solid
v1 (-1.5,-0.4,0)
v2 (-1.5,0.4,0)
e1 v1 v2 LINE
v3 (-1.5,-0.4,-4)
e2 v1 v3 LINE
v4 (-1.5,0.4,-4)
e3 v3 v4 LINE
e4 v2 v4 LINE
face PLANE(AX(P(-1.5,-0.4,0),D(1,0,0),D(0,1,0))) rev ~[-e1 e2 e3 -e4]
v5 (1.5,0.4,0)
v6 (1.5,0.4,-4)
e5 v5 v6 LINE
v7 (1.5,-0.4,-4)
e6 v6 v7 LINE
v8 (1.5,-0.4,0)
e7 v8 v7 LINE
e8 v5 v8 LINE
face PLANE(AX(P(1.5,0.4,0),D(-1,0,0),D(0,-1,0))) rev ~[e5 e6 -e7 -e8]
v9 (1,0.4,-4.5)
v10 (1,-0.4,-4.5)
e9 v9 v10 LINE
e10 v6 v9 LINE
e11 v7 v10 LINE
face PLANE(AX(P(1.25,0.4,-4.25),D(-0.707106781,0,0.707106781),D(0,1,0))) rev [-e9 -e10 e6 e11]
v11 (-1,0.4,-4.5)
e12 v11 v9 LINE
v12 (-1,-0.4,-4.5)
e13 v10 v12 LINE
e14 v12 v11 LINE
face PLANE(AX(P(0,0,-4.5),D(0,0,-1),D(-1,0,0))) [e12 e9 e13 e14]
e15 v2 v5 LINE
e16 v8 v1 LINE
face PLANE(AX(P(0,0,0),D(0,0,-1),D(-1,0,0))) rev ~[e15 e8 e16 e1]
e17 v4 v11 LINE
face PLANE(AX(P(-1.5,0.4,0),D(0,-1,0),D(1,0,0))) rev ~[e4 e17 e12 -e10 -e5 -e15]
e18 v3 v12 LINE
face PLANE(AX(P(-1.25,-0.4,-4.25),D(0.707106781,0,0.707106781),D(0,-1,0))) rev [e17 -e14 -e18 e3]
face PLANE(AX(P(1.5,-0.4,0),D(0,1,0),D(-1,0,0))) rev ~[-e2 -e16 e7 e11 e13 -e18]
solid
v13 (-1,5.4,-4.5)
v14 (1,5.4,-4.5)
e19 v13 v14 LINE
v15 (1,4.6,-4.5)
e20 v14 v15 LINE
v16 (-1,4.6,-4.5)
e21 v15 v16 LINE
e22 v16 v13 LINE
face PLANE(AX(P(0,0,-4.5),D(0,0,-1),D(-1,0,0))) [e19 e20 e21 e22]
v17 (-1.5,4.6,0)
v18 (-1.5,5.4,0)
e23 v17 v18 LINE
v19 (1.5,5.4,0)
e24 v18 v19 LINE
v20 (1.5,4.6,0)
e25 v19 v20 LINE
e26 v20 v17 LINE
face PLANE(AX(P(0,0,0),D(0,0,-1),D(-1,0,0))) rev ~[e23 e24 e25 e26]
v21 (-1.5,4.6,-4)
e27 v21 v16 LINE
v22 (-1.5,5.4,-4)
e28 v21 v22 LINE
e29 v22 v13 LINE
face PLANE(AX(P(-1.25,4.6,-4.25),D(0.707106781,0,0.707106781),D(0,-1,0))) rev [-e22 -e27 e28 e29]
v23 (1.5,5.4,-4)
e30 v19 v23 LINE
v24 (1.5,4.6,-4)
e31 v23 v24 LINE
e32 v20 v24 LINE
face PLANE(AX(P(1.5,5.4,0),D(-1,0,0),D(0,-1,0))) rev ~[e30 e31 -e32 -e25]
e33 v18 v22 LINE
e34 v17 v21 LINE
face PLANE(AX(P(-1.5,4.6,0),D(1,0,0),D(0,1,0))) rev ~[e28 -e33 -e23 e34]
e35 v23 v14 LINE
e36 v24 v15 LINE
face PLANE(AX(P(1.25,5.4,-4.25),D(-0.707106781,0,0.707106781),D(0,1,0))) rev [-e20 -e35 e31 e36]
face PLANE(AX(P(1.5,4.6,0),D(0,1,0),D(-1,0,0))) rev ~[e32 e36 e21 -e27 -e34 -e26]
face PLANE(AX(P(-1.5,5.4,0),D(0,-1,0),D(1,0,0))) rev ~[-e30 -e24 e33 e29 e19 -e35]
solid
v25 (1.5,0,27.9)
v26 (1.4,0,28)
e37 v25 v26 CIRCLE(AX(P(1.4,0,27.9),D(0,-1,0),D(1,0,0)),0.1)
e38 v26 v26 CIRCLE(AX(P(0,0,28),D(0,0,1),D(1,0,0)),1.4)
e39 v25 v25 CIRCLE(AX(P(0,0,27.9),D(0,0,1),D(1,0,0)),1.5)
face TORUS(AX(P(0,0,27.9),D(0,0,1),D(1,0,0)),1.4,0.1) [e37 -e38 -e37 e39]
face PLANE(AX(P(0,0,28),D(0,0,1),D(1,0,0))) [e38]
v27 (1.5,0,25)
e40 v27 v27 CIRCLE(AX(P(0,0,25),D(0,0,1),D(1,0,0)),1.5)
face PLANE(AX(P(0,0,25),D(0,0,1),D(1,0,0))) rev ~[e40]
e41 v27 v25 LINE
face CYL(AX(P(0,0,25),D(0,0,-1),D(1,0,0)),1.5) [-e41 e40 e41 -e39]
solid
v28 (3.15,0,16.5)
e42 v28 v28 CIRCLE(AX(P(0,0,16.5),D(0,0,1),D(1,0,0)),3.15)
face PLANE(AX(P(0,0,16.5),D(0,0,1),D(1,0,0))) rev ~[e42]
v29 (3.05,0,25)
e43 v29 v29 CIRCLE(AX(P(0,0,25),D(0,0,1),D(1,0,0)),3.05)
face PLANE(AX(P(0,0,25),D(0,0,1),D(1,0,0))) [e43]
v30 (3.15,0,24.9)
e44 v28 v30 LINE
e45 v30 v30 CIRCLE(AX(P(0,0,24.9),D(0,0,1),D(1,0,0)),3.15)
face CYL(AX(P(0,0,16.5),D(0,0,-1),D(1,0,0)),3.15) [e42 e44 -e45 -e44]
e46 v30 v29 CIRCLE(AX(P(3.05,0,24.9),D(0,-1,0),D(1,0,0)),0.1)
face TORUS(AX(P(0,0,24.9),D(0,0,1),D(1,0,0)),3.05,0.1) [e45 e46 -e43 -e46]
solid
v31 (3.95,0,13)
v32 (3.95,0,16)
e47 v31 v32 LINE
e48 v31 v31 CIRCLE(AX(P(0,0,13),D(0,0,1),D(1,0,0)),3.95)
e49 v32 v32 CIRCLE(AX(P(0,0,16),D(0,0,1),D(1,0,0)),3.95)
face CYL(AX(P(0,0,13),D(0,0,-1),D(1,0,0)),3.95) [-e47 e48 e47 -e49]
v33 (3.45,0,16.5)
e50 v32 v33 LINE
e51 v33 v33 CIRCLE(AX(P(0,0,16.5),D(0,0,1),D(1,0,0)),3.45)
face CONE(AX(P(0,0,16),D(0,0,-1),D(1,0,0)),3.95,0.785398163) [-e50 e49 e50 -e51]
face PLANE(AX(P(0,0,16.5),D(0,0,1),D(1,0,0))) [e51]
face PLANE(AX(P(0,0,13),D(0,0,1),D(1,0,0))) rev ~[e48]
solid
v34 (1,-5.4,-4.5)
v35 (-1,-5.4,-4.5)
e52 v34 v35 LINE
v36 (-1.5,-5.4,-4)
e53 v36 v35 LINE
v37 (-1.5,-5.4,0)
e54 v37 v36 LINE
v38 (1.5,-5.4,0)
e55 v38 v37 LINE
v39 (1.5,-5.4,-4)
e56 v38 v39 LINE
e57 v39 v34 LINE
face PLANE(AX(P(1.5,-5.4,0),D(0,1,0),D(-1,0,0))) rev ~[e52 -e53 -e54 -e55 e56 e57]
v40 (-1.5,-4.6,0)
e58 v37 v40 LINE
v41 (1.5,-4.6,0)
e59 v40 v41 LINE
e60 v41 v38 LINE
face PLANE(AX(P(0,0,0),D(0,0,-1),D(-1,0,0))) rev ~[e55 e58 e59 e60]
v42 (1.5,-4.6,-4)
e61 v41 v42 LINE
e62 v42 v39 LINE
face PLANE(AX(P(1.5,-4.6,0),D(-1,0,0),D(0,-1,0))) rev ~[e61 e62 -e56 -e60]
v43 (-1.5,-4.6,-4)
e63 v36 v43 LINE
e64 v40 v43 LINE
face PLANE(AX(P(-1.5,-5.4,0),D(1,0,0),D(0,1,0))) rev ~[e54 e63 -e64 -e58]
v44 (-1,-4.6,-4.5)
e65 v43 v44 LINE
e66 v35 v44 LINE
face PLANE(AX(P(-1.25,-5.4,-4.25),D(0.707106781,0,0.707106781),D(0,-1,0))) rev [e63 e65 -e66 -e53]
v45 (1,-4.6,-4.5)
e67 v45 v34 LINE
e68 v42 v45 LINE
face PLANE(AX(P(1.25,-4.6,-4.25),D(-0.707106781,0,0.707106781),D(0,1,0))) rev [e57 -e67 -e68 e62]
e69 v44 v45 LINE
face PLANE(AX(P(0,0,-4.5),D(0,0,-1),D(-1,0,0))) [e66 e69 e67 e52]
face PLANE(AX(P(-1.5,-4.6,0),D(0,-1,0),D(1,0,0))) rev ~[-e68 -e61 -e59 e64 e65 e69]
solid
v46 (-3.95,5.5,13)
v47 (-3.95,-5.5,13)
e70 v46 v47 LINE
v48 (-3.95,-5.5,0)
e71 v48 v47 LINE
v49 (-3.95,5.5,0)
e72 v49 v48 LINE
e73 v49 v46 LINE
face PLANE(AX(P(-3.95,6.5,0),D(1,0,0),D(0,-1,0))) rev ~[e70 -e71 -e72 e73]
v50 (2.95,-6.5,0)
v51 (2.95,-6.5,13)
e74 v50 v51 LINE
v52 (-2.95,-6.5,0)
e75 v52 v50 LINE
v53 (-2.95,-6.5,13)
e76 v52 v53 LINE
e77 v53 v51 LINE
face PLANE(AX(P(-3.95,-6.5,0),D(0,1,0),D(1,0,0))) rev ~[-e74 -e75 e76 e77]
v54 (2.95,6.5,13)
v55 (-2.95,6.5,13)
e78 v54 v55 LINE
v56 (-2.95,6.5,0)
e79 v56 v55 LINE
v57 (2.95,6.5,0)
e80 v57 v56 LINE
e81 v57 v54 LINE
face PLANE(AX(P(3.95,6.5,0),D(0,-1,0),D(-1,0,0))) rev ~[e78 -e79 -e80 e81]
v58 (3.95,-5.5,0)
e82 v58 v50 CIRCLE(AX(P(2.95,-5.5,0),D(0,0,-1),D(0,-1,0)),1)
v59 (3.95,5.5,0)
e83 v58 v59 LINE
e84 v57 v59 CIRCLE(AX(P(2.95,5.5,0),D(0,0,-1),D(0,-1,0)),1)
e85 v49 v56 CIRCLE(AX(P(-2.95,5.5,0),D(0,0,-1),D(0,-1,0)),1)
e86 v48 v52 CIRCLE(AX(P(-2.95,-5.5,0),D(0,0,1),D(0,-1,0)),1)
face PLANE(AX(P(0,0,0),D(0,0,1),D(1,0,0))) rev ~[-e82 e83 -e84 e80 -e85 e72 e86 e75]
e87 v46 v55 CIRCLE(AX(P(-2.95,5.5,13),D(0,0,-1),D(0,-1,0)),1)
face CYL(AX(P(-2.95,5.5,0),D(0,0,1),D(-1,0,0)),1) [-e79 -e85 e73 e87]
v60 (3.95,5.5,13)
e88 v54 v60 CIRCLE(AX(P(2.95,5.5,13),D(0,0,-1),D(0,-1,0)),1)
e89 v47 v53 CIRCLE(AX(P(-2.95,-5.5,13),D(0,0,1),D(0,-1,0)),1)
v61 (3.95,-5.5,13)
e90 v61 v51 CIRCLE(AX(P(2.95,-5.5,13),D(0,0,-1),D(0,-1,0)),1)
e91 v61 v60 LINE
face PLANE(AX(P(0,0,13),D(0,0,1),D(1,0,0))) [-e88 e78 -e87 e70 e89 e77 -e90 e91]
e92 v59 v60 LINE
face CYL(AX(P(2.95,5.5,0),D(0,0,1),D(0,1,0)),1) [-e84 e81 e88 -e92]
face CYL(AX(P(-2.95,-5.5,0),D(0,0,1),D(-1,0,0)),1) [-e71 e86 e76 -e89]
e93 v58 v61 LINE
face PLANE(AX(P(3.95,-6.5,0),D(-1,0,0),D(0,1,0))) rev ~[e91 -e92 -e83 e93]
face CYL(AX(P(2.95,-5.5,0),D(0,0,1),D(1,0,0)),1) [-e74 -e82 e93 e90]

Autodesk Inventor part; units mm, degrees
ref_plane "YZ Plane" through (0, 0, 0) normal (1, 0, 0) x (0, 1, 0)
ref_plane "XZ Plane" through (0, 0, 0) normal (0, 1, 0) x (-1, 0, 0)
ref_plane "XY Plane" through (0, 0, 0) normal (0, 0, 1) x (1, 0, 0)
sketch "Sketch1" plane through (0, 0, 0) normal (0, 0, 1) x (1, 0, 0)
  line L0 (-3.95, -6.5) -> (3.95, -6.5)
  line L1 (3.95, -6.5) -> (3.95, 6.5)
  line L2 (3.95, 6.5) -> (-3.95, 6.5)
  line L3 (-3.95, 6.5) -> (-3.95, -6.5)
  line L4 (-3.95, -6.5) -> (3.95, 6.5) construction
  line L5 (3.95, -6.5) -> (-3.95, 6.5) construction
  point P0 (0, 0)
  dimension "d0" = 13
  dimension "d1" = 7.9
sketch "Sketch1 outline for Extrusion1" plane through (0, 0, 0) normal (0, 0, 1) x (1, 0, 0)
  line L0 (-3.95, -6.5) -> (3.95, -6.5)
  line L1 (-3.95, 6.5) -> (-3.95, -6.5)
  line L2 (3.95, 6.5) -> (-3.95, 6.5)
  line L3 (3.95, -6.5) -> (3.95, 6.5)
extrude "Extrusion1" add sketch "Sketch1 outline for Extrusion1" along normal blind 13
sketch "Sketch2" plane through (0, 0, 0) normal (0, 0, -1) x (-1, 0, 0)
  line L0 (0, -9.1) -> (0, 9.1) projected
  line L1 (-1.5, -5.4) -> (1.5, -5.4)
  line L2 (1.5, -5.4) -> (1.5, -4.6)
  line L3 (1.5, -4.6) -> (-1.5, -4.6)
  line L4 (-1.5, -4.6) -> (-1.5, -5.4)
  line L5 (-1.5, -5.4) -> (1.5, -4.6) construction
  line L6 (1.5, -5.4) -> (-1.5, -4.6) construction
  line L7 (-1.5, -0.4) -> (1.5, -0.4)
  line L8 (1.5, -0.4) -> (1.5, 0.4)
  line L9 (1.5, 0.4) -> (-1.5, 0.4)
  line L10 (-1.5, 0.4) -> (-1.5, -0.4)
  line L11 (-1.5, -0.4) -> (1.5, 0.4) construction
  line L12 (1.5, -0.4) -> (-1.5, 0.4) construction
  line L13 (-1.5, 4.6) -> (1.5, 4.6)
  line L14 (1.5, 4.6) -> (1.5, 5.4)
  line L15 (1.5, 5.4) -> (-1.5, 5.4)
  line L16 (-1.5, 5.4) -> (-1.5, 4.6)
  line L17 (-1.5, 4.6) -> (1.5, 5.4) construction
  line L18 (1.5, 4.6) -> (-1.5, 5.4) construction
  line L19 (-3.95, 6.5) -> (3.95, 6.5) projected
  line L20 (3.95, -6.5) -> (-3.95, -6.5) projected
  point P0 (0, 0)
  point P1 (0, -5)
  point P2 (0, 5)
  dimension "d4" = 1.5
  dimension "d5" = 1.5
  dimension "d6" = 0.8
  dimension "d7" = 0.8
  dimension "d8" = 0.8
  dimension "d9" = 3
sketch "Sketch2 outline for Extrusion2" plane through (0, 0, 0) normal (0, 0, -1) x (-1, 0, 0)
  line L0 (-1.5, -4.6) -> (-1.5, -5.4)
  line L1 (1.5, -4.6) -> (-1.5, -4.6)
  line L2 (1.5, -5.4) -> (1.5, -4.6)
  line L3 (-1.5, -5.4) -> (1.5, -5.4)
  line L4 (-1.5, 0.4) -> (-1.5, -0.4)
  line L5 (1.5, 0.4) -> (-1.5, 0.4)
  line L6 (1.5, -0.4) -> (1.5, 0.4)
  line L7 (-1.5, -0.4) -> (1.5, -0.4)
  line L8 (-1.5, 5.4) -> (-1.5, 4.6)
  line L9 (1.5, 5.4) -> (-1.5, 5.4)
  line L10 (1.5, 4.6) -> (1.5, 5.4)
  line L11 (-1.5, 4.6) -> (1.5, 4.6)
extrude "Extrusion2" add sketch "Sketch2 outline for Extrusion2" along normal blind 4.5 separate body
sketch "Sketch3" plane through (0, 0, 13) normal (0, 0, 1) x (1, 0, 0)
  circle A0 centre (0, 0) radius 3.95
  line L0 (-3.95, 6.5) -> (-3.95, -6.5) projected
sketch "Sketch3 outline for Extrusion3" plane through (0, 0, 13) normal (0, 0, 1) x (1, 0, 0)
  circle A0 centre (0, 0) radius 3.95
extrude "Extrusion3" add sketch "Sketch3 outline for Extrusion3" along normal blind 3.5 separate body
sketch "Sketch4" plane through (0, 0, 16.5) normal (0, 0, 1) x (1, 0, 0)
  circle A0 centre (0, 0) radius 3.15
  dimension "d15" = 6.3
sketch "Sketch4 outline for Extrusion4" plane through (0, 0, 16.5) normal (0, 0, 1) x (1, 0, 0)
  circle A0 centre (0, 0) radius 3.15
extrude "Extrusion4" add sketch "Sketch4 outline for Extrusion4" along normal blind 8.5 separate body
sketch "Sketch5" plane through (0, 0, 25) normal (0, 0, 1) x (1, 0, 0)
  circle A0 centre (0, 0) radius 1.5
  dimension "d18" = 3
sketch "Sketch5 outline for Extrusion5" plane through (0, 0, 25) normal (0, 0, 1) x (1, 0, 0)
  circle A0 centre (0, 0) radius 1.5
extrude "Extrusion5" add sketch "Sketch5 outline for Extrusion5" along normal blind 3 separate body
chamfer "Chamfer1" distance 0.5 angle 45 1 edges at (-3.95, 0, 16.5)
fillet "Fillet1" radius 1 4 edges at (3.95, 6.5, 6.5) (-3.95, 6.5, 6.5) (-3.95, -6.5, 6.5) (3.95, -6.5, 6.5)
chamfer "Chamfer2" distance 0.5 angle 45 6 edges at (-1.5, -5, -4.5) (-1.5, 0, -4.5) (-1.5, 5, -4.5) (1.5, 5, -4.5) (1.5, 0, -4.5) (1.5, -5, -4.5)
fillet "Fillet2" radius 0.1 1 edges at (-1.5, 0, 28)
fillet "Fillet3" radius 0.1 1 edges at (-3.15, 0, 25)
equation "\"d5\" = d4"
equation "\"d7\" = d6"
equation "\"d8\" = d7"
properties part number "MB2011SD3G01-CA"
